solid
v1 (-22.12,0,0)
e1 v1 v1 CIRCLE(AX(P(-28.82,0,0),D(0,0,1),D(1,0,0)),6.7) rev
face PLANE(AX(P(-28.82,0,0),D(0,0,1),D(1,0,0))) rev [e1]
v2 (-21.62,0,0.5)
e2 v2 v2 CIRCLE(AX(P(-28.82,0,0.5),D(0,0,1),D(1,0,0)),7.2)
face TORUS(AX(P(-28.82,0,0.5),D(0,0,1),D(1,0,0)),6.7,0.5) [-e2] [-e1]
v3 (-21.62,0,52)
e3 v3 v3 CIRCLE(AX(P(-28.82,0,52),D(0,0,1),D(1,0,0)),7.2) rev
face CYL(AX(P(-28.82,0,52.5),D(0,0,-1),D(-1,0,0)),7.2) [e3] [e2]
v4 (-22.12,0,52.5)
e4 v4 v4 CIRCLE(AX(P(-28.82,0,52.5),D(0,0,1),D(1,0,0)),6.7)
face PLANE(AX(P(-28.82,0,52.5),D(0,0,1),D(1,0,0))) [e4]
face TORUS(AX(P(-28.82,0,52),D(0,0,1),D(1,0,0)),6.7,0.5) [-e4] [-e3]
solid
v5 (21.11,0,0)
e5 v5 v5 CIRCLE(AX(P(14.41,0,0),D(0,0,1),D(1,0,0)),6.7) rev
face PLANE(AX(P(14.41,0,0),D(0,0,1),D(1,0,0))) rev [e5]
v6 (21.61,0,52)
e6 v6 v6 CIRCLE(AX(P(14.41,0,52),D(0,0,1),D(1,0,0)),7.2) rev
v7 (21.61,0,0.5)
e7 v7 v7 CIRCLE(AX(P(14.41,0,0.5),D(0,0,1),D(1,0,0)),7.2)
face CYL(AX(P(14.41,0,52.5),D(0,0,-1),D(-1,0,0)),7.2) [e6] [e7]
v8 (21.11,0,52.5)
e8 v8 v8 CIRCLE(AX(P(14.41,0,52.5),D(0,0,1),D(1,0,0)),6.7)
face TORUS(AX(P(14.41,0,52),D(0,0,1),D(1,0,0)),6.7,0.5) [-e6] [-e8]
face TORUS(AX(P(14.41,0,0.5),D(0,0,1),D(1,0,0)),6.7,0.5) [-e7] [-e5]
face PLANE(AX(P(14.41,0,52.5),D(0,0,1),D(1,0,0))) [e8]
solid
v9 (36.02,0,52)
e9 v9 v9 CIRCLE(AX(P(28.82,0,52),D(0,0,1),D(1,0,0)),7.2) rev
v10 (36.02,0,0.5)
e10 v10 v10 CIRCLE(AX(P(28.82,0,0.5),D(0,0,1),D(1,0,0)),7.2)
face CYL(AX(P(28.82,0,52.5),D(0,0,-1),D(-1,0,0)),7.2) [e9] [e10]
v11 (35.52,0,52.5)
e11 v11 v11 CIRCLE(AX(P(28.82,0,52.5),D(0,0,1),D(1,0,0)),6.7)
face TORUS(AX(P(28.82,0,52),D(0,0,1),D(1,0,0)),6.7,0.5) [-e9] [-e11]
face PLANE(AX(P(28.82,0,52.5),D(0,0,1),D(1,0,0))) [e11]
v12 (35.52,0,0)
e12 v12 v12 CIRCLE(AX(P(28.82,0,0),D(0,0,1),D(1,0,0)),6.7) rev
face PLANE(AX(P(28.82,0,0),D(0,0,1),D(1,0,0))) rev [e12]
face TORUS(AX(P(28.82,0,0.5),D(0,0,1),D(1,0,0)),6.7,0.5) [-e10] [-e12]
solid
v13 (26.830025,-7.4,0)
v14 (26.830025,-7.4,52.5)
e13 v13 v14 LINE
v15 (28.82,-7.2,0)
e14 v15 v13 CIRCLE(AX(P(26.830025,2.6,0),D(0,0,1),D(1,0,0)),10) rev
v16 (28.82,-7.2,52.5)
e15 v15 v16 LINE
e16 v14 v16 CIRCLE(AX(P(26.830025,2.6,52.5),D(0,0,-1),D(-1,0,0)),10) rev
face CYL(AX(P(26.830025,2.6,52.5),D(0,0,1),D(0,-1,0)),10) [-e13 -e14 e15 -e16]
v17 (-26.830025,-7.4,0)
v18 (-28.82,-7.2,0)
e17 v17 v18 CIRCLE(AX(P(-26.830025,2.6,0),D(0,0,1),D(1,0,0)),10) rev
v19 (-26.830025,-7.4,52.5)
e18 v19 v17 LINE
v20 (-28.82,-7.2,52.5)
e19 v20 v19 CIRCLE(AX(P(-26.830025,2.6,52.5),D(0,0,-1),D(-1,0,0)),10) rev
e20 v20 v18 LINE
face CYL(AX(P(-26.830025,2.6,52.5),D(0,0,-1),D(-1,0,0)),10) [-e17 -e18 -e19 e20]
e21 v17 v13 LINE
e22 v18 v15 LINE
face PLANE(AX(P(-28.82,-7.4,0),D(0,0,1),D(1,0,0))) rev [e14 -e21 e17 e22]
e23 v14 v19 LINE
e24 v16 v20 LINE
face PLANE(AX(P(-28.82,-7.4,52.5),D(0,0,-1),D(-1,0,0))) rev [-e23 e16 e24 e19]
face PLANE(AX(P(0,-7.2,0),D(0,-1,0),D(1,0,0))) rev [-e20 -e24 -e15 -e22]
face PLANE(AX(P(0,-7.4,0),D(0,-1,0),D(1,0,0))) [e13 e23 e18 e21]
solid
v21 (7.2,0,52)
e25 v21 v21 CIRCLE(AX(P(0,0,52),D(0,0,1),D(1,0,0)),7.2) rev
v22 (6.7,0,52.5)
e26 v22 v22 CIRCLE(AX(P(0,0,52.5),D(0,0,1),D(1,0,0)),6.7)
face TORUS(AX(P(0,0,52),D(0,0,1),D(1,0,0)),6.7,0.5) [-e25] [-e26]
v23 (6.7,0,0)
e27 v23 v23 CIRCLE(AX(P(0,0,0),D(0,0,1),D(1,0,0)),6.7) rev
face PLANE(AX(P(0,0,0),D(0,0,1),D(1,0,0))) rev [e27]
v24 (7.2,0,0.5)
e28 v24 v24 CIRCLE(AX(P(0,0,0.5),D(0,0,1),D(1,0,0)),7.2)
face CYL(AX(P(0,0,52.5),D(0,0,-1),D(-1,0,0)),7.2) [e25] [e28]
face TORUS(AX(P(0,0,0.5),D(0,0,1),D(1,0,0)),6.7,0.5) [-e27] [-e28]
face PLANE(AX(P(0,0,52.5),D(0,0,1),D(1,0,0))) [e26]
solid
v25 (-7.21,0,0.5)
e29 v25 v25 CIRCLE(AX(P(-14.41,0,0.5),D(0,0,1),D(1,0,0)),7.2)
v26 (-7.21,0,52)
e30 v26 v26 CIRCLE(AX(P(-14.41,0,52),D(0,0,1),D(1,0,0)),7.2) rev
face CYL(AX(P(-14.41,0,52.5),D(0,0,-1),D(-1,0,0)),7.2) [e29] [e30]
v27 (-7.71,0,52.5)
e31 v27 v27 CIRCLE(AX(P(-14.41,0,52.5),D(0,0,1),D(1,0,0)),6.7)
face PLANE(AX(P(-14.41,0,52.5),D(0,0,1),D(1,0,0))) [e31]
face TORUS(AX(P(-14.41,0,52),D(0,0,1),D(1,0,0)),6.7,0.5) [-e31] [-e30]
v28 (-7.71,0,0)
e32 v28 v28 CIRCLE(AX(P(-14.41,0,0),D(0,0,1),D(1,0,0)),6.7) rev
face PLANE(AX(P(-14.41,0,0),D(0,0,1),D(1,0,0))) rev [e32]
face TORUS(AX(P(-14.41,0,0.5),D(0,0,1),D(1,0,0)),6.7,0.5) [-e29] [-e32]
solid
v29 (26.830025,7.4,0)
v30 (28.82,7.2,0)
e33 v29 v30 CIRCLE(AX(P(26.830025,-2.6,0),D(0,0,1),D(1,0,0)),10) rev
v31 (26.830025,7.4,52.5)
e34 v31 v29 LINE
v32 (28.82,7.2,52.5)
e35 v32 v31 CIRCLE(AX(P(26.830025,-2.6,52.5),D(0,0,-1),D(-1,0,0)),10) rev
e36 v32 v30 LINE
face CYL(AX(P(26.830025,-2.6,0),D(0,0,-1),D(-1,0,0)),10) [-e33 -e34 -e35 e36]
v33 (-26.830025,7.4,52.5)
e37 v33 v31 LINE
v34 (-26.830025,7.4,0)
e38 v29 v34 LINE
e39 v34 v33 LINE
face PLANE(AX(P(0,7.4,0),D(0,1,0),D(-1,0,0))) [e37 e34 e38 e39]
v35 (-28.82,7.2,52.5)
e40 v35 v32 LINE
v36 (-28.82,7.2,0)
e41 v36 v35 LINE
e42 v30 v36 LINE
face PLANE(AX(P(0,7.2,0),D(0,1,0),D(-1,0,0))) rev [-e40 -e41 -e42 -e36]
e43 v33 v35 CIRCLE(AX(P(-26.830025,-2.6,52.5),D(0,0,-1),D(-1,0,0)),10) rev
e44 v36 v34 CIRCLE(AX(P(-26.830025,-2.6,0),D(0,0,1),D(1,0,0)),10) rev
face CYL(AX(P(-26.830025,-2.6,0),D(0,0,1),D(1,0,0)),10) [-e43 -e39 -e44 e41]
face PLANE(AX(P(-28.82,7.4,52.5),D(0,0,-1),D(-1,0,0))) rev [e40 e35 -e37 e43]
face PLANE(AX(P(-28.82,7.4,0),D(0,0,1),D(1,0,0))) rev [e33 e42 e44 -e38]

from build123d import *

# Parameters (mm, degrees)
SKETCH1_R             = 7.2
BOSS_EXTRUDE1_DEPTH   = 52.5
BOSS_EXTRUDE1_2_DEPTH = 52.5
BOSS_EXTRUDE1_3_DEPTH = 52.5
BOSS_EXTRUDE1_4_DEPTH = 52.5
BOSS_EXTRUDE1_5_DEPTH = 52.5
SKETCH3_W             = 57.64
SKETCH3_H             = 52.5
BOSS_EXTRUDE2_DEPTH   = 0.2
SKETCH5_W             = 57.64
SKETCH5_H             = 52.5
BOSS_EXTRUDE3_DEPTH   = 0.2
FILLET2_R             = 10
FILLET3_R             = 10
FILLET4_R             = 0.5
FILLET5_R             = 0.5
FILLET6_R             = 0.5
FILLET7_R             = 0.5
FILLET8_R             = 0.5


with BuildPart() as part:
    # Sketch1 → Boss-Extrude1 (new body)
    with BuildSketch(Plane.XY):
        Circle(SKETCH1_R)
    extrude(amount=BOSS_EXTRUDE1_DEPTH)

    # Fillet6
    fillet6_edges = [part.edges().sort_by_distance(p)[0] for p in [
        (-7.2, 0, 0),
        (-7.2, 0, 52.5),
    ]]
    fillet(fillet6_edges, radius=FILLET6_R)


with BuildPart() as body_2:
    # Sketch1 → Boss-Extrude1 2 (new body)
    with BuildSketch(Plane.XY):
        with Locations((-14.41, 0)):
            Circle(SKETCH1_R)
    extrude(amount=BOSS_EXTRUDE1_2_DEPTH)

    # Fillet5
    fillet5_edges = [body_2.edges().sort_by_distance(p)[0] for p in [
        (-21.61, 0, 0),
        (-21.61, 0, 52.5),
    ]]
    fillet(fillet5_edges, radius=FILLET5_R)


with BuildPart() as body_3:
    # Sketch1 → Boss-Extrude1 3 (new body)
    with BuildSketch(Plane.XY):
        with Locations((-28.82, 0)):
            Circle(SKETCH1_R)
    extrude(amount=BOSS_EXTRUDE1_3_DEPTH)

    # Fillet4
    fillet4_edges = [body_3.edges().sort_by_distance(p)[0] for p in [
        (-36.02, 0, 0),
        (-36.02, 0, 52.5),
    ]]
    fillet(fillet4_edges, radius=FILLET4_R)


with BuildPart() as body_4:
    # Sketch1 → Boss-Extrude1 4 (new body)
    with BuildSketch(Plane.XY):
        with Locations((14.41, 0)):
            Circle(SKETCH1_R)
    extrude(amount=BOSS_EXTRUDE1_4_DEPTH)

    # Fillet7
    fillet7_edges = [body_4.edges().sort_by_distance(p)[0] for p in [
        (7.21, 0, 0),
        (7.21, 0, 52.5),
    ]]
    fillet(fillet7_edges, radius=FILLET7_R)


with BuildPart() as body_5:
    # Sketch1 → Boss-Extrude1 5 (new body)
    with BuildSketch(Plane.XY):
        with Locations((28.82, 0)):
            Circle(SKETCH1_R)
    extrude(amount=BOSS_EXTRUDE1_5_DEPTH)

    # Fillet8
    fillet8_edges = [body_5.edges().sort_by_distance(p)[0] for p in [
        (21.62, 0, 0),
        (21.62, 0, 52.5),
    ]]
    fillet(fillet8_edges, radius=FILLET8_R)


with BuildPart() as body_6:
    # Sketch3 → Boss-Extrude2 (new body)
    with BuildSketch(Plane(origin=(0, 7.2, 0), x_dir=(1, 0, 0), z_dir=(0, 1, 0))):
        with Locations((0, -26.25)):
            Rectangle(SKETCH3_W, SKETCH3_H)
    extrude(amount=BOSS_EXTRUDE2_DEPTH)

    # Fillet2
    # the kernel refuses this fillet: 10 mm, written as the material it takes off along each edge
    with BuildSketch(Plane(origin=(-28.82, 7.4, 57.474937186), x_dir=(0, -1, 0), z_dir=(0, 0, -1)), Plane(origin=(28.82, 7.4, -4.974937186), x_dir=(0, -1, 0), z_dir=(0, 0, 1))) as fillet2_piece_1:
        with BuildLine():
            CenterArc((10, -1.989974874), FILLET2_R, 168.521659045, 11.478340955)
            Line((0, -1.989974874), (-0.2, -1.989974874))
            Line((-0.2, -1.989974874), (-0.2, 0))
            Line((-0.2, 0), (0, 0.2))
            ThreePointArc((0, 0.2), (0.1, 0.2), (0.004, 0.039799497))
            Line((0.004, 0.039799497), (0.2, 0))
        make_face()
    extrude(amount=62.449874371, mode=Mode.SUBTRACT)


with BuildPart() as body_7:
    # Sketch5 → Boss-Extrude3 (new body)
    with BuildSketch(Plane(origin=(0, -7.2, 0), x_dir=(-1, 0, 0), z_dir=(0, -1, 0))):
        with Locations((0, -26.25)):
            Rectangle(SKETCH5_W, SKETCH5_H)
    extrude(amount=BOSS_EXTRUDE3_DEPTH)

    # Fillet3
    # the kernel refuses this fillet: 10 mm, written as the material it takes off along each edge
    with BuildSketch(Plane(origin=(28.82, -7.4, 57.474937186), x_dir=(0, 1, 0), z_dir=(0, 0, -1)), Plane(origin=(-28.82, -7.4, -4.974937186), x_dir=(0, 1, 0), z_dir=(0, 0, 1))) as fillet3_piece_1:
        with BuildLine():
            CenterArc((10, -1.989974874), FILLET3_R, 168.521659045, 11.478340955)
            Line((0, -1.989974874), (-0.2, -1.989974874))
            Line((-0.2, -1.989974874), (-0.2, 0))
            Line((-0.2, 0), (0, 0.2))
            ThreePointArc((0, 0.2), (0.1, 0.2), (0.004, 0.039799497))
            Line((0.004, 0.039799497), (0.2, 0))
        make_face()
    extrude(amount=62.449874371, mode=Mode.SUBTRACT)


solid = Compound([part.part, body_2.part, body_3.part, body_4.part, body_5.part, body_6.part, body_7.part])
